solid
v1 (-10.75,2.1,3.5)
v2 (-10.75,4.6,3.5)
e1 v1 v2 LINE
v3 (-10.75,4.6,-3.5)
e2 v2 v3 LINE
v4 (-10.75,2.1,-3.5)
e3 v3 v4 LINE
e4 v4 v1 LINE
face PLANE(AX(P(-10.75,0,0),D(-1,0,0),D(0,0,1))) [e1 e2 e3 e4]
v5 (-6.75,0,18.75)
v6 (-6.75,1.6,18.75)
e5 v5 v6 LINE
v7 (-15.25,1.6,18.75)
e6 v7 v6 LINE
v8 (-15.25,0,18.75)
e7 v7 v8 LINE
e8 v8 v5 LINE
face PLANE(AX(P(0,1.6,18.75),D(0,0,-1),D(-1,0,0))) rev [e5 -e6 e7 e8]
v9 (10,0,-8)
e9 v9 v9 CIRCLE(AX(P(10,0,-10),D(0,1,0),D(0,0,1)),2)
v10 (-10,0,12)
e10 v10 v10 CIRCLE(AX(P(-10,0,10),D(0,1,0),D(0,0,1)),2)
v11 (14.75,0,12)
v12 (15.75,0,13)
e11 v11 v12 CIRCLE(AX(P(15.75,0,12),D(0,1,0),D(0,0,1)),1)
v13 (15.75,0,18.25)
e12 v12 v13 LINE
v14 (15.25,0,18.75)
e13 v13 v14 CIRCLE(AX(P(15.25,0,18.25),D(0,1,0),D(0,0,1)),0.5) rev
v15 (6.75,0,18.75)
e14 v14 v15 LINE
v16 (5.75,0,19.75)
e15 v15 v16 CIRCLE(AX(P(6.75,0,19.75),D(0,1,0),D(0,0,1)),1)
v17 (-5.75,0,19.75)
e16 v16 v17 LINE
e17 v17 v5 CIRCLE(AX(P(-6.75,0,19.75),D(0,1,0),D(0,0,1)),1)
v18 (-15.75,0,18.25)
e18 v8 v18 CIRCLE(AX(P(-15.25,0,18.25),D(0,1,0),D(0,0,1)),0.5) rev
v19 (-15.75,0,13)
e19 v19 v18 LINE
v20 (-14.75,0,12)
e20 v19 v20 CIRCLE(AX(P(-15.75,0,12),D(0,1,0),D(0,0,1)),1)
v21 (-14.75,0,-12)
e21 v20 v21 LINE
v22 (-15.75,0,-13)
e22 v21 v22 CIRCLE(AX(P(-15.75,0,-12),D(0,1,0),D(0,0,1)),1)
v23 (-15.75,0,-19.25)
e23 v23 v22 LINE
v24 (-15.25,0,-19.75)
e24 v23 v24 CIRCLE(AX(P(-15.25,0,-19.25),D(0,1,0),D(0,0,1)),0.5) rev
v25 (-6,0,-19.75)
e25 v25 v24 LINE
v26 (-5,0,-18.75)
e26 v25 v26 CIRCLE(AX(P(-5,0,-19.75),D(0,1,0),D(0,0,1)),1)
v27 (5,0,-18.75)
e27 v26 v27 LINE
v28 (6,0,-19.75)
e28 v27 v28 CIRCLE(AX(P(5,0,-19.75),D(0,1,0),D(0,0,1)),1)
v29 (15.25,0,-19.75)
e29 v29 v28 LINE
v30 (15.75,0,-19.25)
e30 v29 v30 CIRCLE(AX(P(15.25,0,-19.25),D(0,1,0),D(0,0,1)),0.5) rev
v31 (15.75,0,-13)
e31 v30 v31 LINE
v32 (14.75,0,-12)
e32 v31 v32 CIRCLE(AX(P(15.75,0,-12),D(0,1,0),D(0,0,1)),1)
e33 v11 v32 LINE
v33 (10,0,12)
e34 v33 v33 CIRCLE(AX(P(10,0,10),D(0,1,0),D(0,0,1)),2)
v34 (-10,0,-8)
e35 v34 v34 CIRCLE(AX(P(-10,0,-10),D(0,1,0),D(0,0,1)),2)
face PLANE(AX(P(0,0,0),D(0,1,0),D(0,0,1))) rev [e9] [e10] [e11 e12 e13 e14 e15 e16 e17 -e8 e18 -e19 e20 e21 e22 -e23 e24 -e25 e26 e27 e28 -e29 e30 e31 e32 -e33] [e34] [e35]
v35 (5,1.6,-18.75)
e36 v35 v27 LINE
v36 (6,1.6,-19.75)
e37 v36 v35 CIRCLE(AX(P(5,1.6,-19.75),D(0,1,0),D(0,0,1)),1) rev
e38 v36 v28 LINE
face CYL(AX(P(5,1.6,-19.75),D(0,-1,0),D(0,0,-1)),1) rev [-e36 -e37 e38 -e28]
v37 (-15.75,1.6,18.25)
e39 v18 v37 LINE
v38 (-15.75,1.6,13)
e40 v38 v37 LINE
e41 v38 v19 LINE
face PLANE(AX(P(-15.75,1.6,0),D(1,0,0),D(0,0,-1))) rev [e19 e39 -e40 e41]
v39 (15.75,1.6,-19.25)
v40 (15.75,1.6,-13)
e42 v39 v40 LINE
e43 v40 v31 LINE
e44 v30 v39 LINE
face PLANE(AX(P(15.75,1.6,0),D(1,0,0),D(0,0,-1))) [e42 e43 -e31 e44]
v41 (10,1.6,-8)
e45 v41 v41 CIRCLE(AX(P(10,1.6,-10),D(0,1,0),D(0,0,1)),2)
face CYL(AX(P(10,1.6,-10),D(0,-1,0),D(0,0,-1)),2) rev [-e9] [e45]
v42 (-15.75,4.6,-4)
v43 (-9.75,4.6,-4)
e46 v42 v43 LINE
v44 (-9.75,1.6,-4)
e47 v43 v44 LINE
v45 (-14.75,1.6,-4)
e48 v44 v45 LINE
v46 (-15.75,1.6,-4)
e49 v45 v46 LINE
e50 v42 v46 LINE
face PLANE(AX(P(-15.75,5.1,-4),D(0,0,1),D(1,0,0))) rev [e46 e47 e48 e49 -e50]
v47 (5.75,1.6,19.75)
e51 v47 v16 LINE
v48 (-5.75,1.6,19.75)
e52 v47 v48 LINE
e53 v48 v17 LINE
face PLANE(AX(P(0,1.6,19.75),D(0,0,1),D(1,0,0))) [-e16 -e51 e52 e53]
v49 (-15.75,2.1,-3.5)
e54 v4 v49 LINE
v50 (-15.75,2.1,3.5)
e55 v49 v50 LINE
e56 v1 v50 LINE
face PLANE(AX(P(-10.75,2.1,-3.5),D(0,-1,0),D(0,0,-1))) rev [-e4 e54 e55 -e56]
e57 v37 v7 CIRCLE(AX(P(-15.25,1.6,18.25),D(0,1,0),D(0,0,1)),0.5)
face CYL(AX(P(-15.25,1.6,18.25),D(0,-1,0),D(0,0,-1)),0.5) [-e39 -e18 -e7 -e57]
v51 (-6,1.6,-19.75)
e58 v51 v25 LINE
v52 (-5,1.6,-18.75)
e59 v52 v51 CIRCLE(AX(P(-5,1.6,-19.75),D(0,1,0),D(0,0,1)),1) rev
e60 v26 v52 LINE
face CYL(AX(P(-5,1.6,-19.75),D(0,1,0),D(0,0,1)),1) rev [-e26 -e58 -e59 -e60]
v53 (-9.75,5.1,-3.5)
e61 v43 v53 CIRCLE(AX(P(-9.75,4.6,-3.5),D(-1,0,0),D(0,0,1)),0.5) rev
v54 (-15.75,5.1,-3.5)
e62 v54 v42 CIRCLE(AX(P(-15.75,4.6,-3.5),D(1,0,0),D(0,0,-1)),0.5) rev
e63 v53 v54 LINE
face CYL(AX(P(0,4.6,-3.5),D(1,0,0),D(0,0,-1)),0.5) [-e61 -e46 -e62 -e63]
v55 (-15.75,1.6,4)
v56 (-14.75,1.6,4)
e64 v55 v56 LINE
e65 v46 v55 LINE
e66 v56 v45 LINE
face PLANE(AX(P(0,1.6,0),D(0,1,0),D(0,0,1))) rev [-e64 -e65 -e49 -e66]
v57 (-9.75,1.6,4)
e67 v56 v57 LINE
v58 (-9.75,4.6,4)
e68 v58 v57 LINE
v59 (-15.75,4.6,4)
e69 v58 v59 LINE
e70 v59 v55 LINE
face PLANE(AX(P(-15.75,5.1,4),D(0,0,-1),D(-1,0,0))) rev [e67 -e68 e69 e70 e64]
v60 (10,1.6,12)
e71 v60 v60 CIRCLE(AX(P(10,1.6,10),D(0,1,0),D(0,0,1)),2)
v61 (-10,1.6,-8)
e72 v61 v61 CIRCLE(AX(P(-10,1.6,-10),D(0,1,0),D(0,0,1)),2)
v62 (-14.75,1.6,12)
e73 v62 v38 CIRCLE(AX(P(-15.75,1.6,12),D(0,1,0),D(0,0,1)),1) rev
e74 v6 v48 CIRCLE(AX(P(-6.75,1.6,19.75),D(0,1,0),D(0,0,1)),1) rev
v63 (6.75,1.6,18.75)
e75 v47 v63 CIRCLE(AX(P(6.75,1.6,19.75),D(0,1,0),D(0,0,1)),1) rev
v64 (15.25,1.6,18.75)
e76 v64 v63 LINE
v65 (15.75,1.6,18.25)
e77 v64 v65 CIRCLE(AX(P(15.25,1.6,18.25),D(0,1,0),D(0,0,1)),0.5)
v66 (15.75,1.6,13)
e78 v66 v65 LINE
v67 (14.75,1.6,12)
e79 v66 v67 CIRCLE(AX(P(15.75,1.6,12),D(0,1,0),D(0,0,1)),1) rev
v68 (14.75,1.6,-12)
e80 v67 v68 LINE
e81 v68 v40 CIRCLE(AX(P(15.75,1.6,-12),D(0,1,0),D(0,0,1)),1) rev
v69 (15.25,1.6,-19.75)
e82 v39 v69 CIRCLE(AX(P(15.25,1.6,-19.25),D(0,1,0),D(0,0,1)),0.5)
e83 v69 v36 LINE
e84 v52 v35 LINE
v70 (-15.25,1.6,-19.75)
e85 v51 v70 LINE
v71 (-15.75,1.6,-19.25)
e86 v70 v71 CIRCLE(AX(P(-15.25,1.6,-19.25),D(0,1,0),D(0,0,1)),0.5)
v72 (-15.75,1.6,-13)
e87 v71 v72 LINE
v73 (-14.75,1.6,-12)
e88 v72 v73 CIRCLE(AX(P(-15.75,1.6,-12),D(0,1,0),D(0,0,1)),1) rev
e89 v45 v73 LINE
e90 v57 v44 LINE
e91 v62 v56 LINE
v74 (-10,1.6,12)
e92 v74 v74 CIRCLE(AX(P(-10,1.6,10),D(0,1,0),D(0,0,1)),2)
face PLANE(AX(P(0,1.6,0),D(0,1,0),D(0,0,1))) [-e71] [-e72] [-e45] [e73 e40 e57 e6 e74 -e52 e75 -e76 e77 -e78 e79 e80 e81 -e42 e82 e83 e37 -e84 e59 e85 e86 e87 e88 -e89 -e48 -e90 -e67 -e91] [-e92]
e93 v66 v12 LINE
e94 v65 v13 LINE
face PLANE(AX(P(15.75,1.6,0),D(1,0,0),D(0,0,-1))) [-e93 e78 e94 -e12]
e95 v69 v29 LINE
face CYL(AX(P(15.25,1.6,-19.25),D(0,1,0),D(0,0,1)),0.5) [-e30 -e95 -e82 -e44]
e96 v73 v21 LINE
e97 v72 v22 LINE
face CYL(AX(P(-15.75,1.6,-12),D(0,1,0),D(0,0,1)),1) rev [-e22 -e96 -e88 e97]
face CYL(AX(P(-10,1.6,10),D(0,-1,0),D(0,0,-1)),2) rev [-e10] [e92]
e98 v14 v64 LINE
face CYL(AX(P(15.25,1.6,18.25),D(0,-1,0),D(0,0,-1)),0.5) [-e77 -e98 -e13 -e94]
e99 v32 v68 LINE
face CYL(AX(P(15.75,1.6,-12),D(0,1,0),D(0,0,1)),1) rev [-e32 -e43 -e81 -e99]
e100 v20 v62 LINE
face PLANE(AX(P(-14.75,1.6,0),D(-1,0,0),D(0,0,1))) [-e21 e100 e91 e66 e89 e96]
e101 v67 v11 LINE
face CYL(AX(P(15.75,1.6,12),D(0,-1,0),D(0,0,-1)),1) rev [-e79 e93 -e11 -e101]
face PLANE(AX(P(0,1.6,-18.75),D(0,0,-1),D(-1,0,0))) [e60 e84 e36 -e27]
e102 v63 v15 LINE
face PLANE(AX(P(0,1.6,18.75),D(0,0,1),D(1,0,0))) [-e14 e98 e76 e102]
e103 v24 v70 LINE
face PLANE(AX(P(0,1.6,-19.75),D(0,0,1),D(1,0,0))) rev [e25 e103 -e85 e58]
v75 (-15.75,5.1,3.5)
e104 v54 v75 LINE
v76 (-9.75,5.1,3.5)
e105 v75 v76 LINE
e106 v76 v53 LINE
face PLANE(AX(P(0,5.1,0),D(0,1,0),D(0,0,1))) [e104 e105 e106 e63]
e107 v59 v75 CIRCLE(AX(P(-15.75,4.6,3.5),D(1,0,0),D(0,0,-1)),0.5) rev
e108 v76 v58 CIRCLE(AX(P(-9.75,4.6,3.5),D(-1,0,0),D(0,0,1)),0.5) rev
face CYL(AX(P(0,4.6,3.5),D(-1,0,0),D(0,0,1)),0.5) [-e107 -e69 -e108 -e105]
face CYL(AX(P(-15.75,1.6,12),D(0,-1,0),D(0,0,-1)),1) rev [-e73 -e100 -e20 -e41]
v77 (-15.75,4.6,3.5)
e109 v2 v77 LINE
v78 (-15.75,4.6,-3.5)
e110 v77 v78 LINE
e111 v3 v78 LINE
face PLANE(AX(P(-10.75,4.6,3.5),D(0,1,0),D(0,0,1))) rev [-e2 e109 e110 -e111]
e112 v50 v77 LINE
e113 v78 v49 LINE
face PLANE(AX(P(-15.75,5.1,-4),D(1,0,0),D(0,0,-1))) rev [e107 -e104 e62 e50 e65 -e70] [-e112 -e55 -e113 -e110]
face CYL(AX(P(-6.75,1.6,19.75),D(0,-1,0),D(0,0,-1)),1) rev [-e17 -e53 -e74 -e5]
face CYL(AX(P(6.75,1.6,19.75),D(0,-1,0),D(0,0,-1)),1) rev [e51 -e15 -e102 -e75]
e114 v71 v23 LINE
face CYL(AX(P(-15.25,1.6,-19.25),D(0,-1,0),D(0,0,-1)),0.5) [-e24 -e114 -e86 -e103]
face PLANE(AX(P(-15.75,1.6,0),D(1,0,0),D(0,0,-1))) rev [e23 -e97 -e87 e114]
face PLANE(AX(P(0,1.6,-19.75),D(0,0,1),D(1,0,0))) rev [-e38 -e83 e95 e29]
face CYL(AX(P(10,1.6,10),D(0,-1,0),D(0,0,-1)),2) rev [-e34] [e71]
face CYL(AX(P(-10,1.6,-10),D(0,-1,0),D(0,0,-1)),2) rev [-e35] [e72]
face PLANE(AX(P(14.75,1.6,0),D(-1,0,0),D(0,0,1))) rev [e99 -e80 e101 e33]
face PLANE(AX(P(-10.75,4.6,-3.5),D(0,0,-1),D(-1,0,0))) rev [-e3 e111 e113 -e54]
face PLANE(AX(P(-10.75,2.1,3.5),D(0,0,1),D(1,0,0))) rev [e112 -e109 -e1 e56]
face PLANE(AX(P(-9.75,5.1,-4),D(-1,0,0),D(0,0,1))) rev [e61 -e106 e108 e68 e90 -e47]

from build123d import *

# Parameters (mm, degrees)
SKETCH1_R           = 2
BOSS_EXTRUDE1_DEPTH = 1.6
SKETCH2_W           = 6
SKETCH2_H           = 8
BOSS_EXTRUDE2_DEPTH = 3.5
FILLET1_R           = 1
FILLET2_R           = 0.5
SKETCH3_W           = 7
SKETCH3_H           = 2.5
CUT_EXTRUDE1_DEPTH  = 5


with BuildPart() as part:
    # Sketch1 → Boss-Extrude1 (new body)
    with BuildSketch(Plane(origin=(0, 0, 0), x_dir=(1, 0, 0), z_dir=(0, 1, 0))):
        Polygon((15.75, 13), (15.75, 19.75), (6, 19.75), (6, 18.75), (-6, 18.75), (-6, 19.75), (-15.75, 19.75), (-15.75, 13), (-14.75, 13), (-14.75, -13), (-15.75, -13), (-15.75, -18.75), (-5.75, -18.75), (-5.75, -19.75), (5.75, -19.75), (5.75, -18.75), (15.75, -18.75), (15.75, -13), (14.75, -13), (14.75, 13), align=None)
        with Locations(Location((10, -10, 0), (0, 0, 270))):
            Circle(SKETCH1_R, mode=Mode.SUBTRACT)
        with Locations(Location((10, 10, 0), (0, 0, 270))):
            Circle(SKETCH1_R, mode=Mode.SUBTRACT)
        with Locations(Location((-10, 10, 0), (0, 0, 270))):
            Circle(SKETCH1_R, mode=Mode.SUBTRACT)
        with Locations(Location((-10, -10, 0), (0, 0, 270))):
            Circle(SKETCH1_R, mode=Mode.SUBTRACT)
    extrude(amount=BOSS_EXTRUDE1_DEPTH)

    # Sketch2 → Boss-Extrude2 (add)
    with BuildSketch(Plane(origin=(0, 1.6, 0), x_dir=(1, 0, 0), z_dir=(0, 1, 0))):
        with Locations((-12.75, 0)):
            Rectangle(SKETCH2_W, SKETCH2_H)
    extrude(amount=BOSS_EXTRUDE2_DEPTH)

    # Fillet1
    fillet1_edges = [part.edges().sort_by_distance(p)[0] for p in [
        (14.75, 0.8, -13),
        (14.75, 0.8, 13),
        (-6, 0.8, -18.75),
        (6, 0.8, -18.75),
        (-14.75, 0.8, -13),
        (-14.75, 0.8, 13),
        (-5.75, 0.8, 18.75),
        (5.75, 0.8, 18.75),
    ]]
    fillet(fillet1_edges, radius=FILLET1_R - 0.0001)  # a hair under: the kernel refuses the full size

    # Fillet2
    fillet2_edges = [part.edges().sort_by_distance(p)[0] for p in [
        (-15.75, 0.8, 18.75),
        (-15.75, 0.8, -19.75),
        (15.75, 0.8, -19.75),
        (15.75, 0.8, 18.75),
        (-12.75, 5.1, -4),
        (-12.75, 5.1, 4),
    ]]
    fillet(fillet2_edges, radius=FILLET2_R)

    # Sketch3 → Cut-Extrude1 (cut)
    with BuildSketch(Plane.ZY.offset(15.75)):
        with Locations((0, 3.35)):
            Rectangle(SKETCH3_W, SKETCH3_H)
    extrude(amount=-CUT_EXTRUDE1_DEPTH, mode=Mode.SUBTRACT)


solid = part.part
